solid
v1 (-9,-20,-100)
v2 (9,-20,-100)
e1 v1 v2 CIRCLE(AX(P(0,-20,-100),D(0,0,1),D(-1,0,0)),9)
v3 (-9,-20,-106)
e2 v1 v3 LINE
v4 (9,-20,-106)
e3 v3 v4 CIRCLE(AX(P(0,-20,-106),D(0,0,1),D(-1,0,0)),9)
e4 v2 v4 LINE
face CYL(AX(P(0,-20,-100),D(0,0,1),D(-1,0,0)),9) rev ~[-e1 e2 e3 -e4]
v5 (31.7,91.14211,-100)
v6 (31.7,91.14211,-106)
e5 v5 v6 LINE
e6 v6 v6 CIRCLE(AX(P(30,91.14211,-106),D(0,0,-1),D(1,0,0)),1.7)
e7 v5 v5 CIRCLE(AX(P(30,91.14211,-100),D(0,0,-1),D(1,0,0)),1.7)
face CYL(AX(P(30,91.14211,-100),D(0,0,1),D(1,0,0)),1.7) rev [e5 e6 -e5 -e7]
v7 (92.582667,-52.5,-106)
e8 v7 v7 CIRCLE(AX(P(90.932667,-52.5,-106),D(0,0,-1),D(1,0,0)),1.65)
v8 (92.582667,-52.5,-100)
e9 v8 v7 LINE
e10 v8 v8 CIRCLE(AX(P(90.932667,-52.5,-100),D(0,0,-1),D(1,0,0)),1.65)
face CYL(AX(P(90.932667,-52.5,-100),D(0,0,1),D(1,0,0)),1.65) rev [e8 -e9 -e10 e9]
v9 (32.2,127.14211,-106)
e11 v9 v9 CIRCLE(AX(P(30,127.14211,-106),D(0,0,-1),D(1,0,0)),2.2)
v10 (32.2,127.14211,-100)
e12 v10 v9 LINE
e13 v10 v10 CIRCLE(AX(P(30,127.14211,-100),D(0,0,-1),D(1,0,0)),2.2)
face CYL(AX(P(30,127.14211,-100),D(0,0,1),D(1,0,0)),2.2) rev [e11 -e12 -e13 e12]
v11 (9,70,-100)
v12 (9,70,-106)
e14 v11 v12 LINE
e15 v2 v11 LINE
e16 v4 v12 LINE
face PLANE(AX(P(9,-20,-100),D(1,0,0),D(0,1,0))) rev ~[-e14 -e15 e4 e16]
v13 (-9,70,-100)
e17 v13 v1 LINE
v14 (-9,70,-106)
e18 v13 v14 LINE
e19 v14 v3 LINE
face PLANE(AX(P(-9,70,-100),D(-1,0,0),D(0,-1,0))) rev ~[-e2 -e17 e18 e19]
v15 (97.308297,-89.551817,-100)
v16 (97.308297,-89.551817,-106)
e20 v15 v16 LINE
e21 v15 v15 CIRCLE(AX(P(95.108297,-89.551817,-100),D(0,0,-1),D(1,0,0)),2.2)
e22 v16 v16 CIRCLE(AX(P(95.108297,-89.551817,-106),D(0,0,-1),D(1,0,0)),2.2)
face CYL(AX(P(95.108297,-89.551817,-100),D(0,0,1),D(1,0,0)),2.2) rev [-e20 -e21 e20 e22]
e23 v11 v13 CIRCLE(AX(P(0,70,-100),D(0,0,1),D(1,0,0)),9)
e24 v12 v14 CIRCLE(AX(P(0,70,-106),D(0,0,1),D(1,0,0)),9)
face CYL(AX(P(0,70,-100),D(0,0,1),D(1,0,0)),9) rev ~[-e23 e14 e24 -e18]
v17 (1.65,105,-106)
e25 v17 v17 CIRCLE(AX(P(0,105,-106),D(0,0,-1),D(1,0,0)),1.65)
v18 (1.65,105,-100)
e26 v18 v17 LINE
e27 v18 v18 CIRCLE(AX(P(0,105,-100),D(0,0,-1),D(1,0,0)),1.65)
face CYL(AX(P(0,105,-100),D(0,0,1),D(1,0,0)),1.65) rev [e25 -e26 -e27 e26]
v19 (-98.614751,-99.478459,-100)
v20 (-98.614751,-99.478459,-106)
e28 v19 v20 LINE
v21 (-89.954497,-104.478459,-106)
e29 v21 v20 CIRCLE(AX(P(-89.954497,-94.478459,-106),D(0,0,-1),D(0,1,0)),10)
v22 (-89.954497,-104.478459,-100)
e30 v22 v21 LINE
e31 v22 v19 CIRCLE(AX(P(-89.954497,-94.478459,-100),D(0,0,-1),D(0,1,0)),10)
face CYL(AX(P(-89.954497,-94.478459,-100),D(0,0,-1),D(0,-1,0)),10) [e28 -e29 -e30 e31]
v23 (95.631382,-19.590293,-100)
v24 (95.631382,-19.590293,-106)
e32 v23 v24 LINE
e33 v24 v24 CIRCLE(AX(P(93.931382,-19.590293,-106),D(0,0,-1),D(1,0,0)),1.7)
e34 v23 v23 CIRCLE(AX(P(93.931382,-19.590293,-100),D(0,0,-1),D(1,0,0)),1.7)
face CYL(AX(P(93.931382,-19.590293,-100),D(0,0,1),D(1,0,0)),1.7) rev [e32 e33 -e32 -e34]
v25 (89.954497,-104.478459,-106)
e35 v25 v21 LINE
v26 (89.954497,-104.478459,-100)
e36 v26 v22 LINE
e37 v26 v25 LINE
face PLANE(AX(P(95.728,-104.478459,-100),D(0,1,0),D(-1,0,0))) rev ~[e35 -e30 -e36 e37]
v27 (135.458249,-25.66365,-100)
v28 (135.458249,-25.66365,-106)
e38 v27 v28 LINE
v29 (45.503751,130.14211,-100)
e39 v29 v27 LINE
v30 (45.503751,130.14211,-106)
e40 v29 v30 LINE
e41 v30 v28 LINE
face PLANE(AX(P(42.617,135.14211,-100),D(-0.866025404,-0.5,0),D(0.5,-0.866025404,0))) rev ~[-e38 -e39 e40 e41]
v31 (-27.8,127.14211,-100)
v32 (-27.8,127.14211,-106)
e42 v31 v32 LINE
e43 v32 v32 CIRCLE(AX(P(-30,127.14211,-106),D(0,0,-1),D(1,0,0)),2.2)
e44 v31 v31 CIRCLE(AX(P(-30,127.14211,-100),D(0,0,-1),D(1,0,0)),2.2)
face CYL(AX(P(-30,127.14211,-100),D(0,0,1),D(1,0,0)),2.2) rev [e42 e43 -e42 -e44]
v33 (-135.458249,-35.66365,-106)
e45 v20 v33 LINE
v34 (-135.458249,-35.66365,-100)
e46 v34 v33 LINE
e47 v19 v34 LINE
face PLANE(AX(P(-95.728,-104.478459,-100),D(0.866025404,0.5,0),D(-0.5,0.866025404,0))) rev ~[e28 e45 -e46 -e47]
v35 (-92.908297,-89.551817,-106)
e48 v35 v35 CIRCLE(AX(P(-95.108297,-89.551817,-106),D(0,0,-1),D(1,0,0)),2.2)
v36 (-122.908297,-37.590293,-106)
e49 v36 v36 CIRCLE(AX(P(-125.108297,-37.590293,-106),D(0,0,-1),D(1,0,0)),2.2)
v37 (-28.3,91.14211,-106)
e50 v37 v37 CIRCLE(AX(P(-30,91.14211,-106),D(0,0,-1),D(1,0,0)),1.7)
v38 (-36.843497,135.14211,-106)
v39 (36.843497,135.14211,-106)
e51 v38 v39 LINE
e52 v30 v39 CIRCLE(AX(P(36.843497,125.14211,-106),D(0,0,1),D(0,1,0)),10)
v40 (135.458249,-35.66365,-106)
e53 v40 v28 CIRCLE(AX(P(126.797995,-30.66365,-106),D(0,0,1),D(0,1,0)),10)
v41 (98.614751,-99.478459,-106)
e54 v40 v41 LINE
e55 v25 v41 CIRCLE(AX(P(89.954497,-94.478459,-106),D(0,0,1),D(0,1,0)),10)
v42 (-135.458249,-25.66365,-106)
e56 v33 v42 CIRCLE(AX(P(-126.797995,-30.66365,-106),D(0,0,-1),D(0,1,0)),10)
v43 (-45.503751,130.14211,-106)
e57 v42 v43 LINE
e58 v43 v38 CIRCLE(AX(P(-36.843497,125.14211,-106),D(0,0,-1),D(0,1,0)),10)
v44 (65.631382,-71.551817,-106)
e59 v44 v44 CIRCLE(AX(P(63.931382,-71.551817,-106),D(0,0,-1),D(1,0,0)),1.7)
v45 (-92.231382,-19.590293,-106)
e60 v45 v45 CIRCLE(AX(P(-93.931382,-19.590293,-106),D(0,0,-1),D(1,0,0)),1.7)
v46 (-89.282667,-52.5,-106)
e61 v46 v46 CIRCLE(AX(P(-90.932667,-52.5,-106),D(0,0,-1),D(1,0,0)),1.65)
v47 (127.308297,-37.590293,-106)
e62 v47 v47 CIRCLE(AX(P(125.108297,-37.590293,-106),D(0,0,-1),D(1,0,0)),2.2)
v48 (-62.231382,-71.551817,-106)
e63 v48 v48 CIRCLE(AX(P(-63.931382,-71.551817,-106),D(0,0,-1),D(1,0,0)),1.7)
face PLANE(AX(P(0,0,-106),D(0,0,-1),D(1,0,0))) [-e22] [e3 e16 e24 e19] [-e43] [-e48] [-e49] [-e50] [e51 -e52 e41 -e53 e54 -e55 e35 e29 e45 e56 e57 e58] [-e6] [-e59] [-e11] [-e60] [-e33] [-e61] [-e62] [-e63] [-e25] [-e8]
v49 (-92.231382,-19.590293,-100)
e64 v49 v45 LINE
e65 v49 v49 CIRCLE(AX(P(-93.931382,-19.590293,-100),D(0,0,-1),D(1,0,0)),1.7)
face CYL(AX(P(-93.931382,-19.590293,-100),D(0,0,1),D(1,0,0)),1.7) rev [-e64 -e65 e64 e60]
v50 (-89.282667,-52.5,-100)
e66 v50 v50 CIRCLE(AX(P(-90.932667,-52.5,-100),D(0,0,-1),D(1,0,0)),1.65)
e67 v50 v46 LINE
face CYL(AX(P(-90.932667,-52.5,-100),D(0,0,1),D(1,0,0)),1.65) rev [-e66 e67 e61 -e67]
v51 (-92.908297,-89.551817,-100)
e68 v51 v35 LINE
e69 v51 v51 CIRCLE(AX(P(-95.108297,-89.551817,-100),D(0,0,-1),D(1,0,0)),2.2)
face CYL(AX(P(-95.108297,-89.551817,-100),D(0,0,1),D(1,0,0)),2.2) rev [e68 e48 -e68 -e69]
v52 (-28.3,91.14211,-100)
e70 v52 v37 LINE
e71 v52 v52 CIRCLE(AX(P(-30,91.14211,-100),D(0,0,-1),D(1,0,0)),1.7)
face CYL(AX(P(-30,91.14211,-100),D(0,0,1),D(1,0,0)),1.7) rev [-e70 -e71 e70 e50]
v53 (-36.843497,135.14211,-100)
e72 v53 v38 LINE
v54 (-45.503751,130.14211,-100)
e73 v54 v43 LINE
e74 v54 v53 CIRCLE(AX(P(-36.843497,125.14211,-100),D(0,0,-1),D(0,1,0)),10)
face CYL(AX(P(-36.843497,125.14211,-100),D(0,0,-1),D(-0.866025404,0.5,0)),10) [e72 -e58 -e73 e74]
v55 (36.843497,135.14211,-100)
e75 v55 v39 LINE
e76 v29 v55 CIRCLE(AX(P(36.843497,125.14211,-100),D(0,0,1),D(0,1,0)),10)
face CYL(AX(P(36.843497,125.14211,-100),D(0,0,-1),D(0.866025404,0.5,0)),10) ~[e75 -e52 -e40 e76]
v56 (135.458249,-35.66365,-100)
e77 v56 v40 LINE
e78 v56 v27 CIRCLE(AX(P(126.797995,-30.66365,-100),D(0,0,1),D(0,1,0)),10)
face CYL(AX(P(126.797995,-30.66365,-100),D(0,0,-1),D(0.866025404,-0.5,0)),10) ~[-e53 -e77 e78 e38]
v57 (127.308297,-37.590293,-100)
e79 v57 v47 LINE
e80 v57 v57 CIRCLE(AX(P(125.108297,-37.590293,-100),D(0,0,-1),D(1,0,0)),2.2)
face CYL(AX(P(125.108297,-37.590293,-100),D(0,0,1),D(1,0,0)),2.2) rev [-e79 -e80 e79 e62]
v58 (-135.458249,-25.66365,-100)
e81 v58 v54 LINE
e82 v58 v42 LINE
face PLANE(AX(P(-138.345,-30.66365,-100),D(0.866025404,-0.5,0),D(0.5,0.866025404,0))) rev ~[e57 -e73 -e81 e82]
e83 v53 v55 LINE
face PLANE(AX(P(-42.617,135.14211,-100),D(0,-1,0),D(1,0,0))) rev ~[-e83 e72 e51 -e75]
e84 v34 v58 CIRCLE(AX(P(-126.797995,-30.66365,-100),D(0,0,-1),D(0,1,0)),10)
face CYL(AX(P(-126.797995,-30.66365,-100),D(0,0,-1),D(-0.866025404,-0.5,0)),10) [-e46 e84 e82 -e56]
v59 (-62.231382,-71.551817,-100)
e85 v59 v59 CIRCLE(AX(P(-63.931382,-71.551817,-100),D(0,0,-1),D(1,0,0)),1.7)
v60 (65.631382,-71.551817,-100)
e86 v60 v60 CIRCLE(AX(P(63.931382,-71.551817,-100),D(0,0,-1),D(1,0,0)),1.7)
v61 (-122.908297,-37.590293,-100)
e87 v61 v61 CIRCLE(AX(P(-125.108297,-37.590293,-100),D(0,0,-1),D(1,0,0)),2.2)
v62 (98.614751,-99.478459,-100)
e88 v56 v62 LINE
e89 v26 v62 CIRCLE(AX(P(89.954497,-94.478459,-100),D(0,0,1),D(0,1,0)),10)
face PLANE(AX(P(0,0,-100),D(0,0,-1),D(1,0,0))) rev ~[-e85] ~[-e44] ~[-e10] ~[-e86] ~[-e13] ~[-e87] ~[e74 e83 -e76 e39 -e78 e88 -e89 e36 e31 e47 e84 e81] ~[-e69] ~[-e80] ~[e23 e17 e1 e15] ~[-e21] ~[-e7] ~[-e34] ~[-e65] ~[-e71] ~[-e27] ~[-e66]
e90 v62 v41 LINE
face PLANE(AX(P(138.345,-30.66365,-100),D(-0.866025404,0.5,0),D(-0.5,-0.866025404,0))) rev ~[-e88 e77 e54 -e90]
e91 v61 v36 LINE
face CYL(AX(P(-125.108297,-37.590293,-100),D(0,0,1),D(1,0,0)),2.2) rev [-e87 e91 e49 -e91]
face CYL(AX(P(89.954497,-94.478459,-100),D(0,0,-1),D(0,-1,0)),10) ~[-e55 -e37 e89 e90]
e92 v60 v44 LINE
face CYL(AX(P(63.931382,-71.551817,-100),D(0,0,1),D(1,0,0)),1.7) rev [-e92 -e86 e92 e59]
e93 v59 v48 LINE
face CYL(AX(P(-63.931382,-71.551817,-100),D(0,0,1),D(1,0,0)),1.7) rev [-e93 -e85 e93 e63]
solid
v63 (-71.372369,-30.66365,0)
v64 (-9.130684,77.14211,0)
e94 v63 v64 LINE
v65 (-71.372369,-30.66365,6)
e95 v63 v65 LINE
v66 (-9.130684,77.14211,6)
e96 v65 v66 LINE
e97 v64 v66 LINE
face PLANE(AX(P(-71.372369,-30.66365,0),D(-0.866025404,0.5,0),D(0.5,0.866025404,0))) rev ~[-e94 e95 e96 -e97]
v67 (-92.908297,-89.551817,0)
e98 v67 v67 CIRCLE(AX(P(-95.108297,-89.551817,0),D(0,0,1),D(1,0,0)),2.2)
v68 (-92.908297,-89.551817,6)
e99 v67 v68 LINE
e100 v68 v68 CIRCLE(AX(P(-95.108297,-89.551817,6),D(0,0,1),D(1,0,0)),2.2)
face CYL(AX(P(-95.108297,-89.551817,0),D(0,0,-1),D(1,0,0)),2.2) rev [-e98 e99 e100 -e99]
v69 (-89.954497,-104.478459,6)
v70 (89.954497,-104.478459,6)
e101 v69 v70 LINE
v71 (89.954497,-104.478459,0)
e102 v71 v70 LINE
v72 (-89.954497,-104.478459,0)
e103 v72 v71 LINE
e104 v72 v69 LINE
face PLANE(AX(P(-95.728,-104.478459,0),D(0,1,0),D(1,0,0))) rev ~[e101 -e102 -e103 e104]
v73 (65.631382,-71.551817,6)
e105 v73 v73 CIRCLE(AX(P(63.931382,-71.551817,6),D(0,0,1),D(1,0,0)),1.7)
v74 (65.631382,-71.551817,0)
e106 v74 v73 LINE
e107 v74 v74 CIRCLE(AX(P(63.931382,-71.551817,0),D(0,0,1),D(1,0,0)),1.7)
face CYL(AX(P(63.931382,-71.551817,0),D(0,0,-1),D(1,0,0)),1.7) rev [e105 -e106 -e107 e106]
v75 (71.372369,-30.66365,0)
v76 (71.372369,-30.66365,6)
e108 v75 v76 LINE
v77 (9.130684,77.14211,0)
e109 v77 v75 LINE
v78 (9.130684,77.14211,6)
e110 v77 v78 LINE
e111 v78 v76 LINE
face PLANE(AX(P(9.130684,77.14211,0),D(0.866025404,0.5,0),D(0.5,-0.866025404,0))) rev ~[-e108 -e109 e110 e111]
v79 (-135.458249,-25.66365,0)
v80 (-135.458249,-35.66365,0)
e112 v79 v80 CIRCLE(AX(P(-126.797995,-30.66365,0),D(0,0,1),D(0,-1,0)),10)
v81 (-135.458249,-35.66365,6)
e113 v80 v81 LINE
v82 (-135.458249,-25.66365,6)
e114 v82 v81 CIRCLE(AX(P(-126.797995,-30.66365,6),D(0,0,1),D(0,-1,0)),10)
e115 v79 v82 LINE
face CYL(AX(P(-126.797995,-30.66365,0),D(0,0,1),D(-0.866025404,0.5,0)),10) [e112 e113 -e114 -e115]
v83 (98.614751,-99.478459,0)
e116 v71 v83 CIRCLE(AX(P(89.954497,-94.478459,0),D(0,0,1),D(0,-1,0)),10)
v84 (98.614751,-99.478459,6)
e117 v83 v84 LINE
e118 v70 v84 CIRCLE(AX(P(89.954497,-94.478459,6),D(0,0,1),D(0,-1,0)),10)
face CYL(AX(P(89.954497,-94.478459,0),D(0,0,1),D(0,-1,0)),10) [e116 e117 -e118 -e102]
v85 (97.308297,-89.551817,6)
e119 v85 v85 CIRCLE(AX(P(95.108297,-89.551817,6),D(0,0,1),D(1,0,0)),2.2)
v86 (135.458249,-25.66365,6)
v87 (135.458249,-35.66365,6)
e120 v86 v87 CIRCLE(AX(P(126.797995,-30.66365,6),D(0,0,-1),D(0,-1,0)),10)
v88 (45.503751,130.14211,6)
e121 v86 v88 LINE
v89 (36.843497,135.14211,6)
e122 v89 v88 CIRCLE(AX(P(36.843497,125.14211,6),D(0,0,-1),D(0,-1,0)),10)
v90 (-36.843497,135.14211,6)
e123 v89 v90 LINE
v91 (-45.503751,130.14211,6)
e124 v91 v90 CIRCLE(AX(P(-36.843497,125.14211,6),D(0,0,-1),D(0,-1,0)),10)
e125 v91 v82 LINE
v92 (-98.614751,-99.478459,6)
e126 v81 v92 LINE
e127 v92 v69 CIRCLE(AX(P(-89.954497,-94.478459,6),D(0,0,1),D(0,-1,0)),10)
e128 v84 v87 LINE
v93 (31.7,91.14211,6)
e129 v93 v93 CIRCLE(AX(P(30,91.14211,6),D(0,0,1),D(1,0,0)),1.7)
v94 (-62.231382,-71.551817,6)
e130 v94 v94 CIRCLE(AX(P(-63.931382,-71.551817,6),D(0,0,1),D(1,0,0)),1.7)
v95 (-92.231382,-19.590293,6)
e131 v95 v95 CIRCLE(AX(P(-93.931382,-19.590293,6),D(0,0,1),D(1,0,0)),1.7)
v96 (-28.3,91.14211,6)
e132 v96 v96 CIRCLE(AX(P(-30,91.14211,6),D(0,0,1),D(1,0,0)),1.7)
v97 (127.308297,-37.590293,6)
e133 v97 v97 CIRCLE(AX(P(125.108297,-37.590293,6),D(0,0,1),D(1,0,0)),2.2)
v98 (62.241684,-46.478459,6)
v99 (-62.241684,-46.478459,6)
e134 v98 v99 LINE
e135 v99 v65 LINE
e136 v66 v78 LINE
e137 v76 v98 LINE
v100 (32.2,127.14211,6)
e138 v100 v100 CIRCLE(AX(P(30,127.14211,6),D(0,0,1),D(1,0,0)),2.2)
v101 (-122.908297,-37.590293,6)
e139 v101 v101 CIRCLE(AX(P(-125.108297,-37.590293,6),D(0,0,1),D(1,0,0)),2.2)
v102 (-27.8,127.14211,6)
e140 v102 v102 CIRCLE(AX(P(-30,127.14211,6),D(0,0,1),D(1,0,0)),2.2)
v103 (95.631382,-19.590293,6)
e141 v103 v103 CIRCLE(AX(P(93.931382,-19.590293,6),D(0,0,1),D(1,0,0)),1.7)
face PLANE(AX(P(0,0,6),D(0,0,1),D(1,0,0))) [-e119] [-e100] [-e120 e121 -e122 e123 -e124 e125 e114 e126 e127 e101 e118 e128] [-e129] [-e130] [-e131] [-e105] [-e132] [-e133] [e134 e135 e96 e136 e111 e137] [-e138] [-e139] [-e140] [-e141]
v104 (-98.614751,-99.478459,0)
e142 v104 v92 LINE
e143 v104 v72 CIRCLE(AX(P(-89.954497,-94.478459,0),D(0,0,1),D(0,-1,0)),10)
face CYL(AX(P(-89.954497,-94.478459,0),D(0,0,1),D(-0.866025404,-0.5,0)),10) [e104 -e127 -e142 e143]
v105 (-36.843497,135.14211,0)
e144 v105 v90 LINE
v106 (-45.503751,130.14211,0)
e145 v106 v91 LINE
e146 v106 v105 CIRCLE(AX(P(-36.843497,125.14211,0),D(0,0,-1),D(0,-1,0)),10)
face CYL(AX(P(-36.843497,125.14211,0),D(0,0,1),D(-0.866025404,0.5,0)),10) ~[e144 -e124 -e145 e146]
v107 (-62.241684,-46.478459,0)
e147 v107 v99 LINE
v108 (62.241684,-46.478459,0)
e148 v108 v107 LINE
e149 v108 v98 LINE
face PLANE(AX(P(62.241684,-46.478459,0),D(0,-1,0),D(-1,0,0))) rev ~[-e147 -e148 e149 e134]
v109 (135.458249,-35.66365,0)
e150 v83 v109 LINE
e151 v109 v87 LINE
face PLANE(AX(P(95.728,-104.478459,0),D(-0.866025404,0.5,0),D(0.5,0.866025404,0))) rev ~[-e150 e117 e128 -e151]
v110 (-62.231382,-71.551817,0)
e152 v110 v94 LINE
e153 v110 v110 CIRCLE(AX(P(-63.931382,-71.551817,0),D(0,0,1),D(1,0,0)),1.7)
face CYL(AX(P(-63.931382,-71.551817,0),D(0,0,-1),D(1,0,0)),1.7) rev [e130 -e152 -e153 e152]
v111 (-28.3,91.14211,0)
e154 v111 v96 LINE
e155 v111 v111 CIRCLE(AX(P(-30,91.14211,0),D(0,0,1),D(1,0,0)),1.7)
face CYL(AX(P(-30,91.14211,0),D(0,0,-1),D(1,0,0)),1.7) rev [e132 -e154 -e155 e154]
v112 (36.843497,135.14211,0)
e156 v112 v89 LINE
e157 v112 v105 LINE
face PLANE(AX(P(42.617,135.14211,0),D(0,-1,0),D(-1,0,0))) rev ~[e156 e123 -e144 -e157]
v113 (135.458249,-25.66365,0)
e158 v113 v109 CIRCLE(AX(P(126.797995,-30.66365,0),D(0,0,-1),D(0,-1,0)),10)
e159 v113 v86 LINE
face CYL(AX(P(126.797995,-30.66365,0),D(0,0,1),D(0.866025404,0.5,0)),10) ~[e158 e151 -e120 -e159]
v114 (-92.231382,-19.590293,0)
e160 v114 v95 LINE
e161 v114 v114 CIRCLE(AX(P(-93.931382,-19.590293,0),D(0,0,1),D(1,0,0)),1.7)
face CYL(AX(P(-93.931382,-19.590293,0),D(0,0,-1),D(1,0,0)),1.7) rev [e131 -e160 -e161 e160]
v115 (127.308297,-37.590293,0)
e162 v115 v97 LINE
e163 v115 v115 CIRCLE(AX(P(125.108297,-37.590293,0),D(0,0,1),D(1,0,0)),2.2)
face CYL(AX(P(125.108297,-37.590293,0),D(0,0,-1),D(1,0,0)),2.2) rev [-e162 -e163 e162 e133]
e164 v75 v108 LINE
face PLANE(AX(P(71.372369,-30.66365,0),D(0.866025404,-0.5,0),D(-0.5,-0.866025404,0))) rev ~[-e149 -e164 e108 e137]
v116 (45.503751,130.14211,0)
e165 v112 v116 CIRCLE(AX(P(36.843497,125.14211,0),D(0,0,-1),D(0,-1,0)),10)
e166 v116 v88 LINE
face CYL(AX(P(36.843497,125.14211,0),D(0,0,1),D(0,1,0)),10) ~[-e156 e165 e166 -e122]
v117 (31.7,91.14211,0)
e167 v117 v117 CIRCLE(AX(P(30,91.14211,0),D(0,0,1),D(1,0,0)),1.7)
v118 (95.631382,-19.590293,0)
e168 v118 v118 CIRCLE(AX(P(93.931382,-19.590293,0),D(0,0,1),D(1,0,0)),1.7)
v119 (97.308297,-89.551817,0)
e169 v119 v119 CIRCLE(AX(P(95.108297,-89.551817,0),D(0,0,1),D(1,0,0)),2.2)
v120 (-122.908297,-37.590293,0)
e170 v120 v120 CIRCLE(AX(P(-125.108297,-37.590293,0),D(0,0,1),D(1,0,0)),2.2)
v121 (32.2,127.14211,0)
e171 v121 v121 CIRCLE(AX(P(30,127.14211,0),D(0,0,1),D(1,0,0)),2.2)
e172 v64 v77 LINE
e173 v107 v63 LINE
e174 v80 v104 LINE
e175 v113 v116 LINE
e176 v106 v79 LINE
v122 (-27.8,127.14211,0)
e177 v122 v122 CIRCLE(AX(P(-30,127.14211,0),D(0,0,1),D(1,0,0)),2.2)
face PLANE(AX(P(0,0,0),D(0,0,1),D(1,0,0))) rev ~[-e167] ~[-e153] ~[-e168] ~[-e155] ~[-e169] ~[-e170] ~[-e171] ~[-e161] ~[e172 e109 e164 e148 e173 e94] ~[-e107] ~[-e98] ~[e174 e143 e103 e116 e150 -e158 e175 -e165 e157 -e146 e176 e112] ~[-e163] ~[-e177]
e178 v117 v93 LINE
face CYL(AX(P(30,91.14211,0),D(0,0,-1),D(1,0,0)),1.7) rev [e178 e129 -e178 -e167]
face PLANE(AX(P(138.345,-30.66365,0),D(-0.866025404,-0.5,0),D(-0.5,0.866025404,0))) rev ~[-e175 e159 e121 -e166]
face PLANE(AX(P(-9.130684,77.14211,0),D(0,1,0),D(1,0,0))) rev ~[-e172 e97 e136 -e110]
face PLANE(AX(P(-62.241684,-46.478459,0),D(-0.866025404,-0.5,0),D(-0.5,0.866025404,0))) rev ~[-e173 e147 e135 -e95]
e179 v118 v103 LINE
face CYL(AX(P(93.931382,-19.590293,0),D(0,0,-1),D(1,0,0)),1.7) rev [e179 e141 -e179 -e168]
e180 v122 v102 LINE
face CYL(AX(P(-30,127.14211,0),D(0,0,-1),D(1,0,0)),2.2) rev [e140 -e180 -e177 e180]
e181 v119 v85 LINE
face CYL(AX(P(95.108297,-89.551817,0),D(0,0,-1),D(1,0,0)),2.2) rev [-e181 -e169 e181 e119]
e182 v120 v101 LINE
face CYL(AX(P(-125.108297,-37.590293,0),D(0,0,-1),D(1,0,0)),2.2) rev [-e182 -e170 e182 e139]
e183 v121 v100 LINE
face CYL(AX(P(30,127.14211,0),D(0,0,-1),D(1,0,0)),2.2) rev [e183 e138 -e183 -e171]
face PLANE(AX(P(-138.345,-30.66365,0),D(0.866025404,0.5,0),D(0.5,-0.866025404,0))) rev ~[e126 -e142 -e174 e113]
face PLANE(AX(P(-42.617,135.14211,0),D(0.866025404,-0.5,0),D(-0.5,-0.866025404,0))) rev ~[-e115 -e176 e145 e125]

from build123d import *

# Parameters (mm, degrees)
F0_R     = 2.2
F0_R_2   = 1.7
F1_DEPTH = 6
F3_R     = 2.2
F3_R_2   = 1.7
F3_R_3   = 1.65
F4_DEPTH = 6
F5_R     = 10
F5_2_R   = 10


# Not quite as in the source:
# - a feature names something its author has since deleted; it is built from what else it names


with BuildPart() as f1:
    # F0 (on Top) → F1 (new body)
    with BuildSketch(Plane.XY):
        Polygon((-42.617, 135.14210956), (-138.345, -30.6636501469), (-95.728, -104.4784594131), (95.728, -104.4784594131), (138.345, -30.6636501469), (42.617, 135.14210956), align=None)
        with Locations((-95.1082967697, -89.5518168935)):
            Circle(F0_R, mode=Mode.SUBTRACT)
        with Locations((-63.9313822335, -71.5518168935)):
            Circle(F0_R_2, mode=Mode.SUBTRACT)
        with Locations((-125.1082967697, -37.5902926665)):
            Circle(F0_R, mode=Mode.SUBTRACT)
        with Locations((-93.9313822335, -19.5902926665)):
            Circle(F0_R_2, mode=Mode.SUBTRACT)
        with Locations((63.9313822335, -71.5518168935)):
            Circle(F0_R_2, mode=Mode.SUBTRACT)
        with Locations((95.1082967697, -89.5518168935)):
            Circle(F0_R, mode=Mode.SUBTRACT)
        Polygon((71.372368774, -30.6636501469), (62.241684387, -46.4784594131), (-62.241684387, -46.4784594131), (-71.372368774, -30.6636501469), (-9.130684387, 77.14210956), (9.130684387, 77.14210956), align=None, mode=Mode.SUBTRACT)
        with Locations((93.9313822335, -19.5902926665)):
            Circle(F0_R_2, mode=Mode.SUBTRACT)
        with Locations((125.1082967697, -37.5902926665)):
            Circle(F0_R, mode=Mode.SUBTRACT)
        with Locations((-30, 91.14210956)):
            Circle(F0_R_2, mode=Mode.SUBTRACT)
        with Locations((-30, 127.14210956)):
            Circle(F0_R, mode=Mode.SUBTRACT)
        with Locations((30, 91.14210956)):
            Circle(F0_R_2, mode=Mode.SUBTRACT)
        with Locations((30, 127.14210956)):
            Circle(F0_R, mode=Mode.SUBTRACT)
    extrude(amount=F1_DEPTH)

    # F5
    f5_edges = [f1.edges().sort_by_distance(p)[0] for p in [
        (95.728, -104.478459, 3),
        (138.345, -30.66365, 3),
        (-95.728, -104.478459, 3),
        (-138.345, -30.66365, 3),
        (-42.617, 135.14211, 3),
        (42.617, 135.14211, 3),
    ]]
    fillet(f5_edges, radius=F5_R)


with BuildPart() as f4:
    # F3 (on offset) → F4 (new body)
    with BuildSketch(Plane(origin=(0, 0, -100), x_dir=(1, 0, 0), z_dir=(0, 0, -1))):
        Polygon((95.728, 104.4784594131), (-95.728, 104.4784594131), (-138.345, 30.6636501469), (-42.617, -135.14210956), (42.617, -135.14210956), (138.345, 30.6636501469), align=None)
        with Locations((-30, -127.14210956)):
            Circle(F3_R, mode=Mode.SUBTRACT)
        with Locations((-30, -91.14210956)):
            Circle(F3_R_2, mode=Mode.SUBTRACT)
        with Locations((0, -105)):
            Circle(F3_R_3, mode=Mode.SUBTRACT)
        with BuildLine():
            Line((-9, -70), (-9, 20))
            ThreePointArc((-9, 20), (0, 29), (9, 20))
            Line((9, 20), (9, -70))
            ThreePointArc((9, -70), (0, -79), (-9, -70))
        make_face(mode=Mode.SUBTRACT)
        with Locations((30, -127.14210956)):
            Circle(F3_R, mode=Mode.SUBTRACT)
        with Locations((30, -91.14210956)):
            Circle(F3_R_2, mode=Mode.SUBTRACT)
        with Locations((-125.1082967697, 37.5902926665)):
            Circle(F3_R, mode=Mode.SUBTRACT)
        with Locations((-93.9313822335, 19.5902926665)):
            Circle(F3_R_2, mode=Mode.SUBTRACT)
        with Locations((-90.9326673974, 52.5)):
            Circle(F3_R_3, mode=Mode.SUBTRACT)
        with Locations((-95.1082967697, 89.5518168935)):
            Circle(F3_R, mode=Mode.SUBTRACT)
        with Locations((-63.9313822335, 71.5518168935)):
            Circle(F3_R_2, mode=Mode.SUBTRACT)
        with Locations((93.9313822335, 19.5902926665)):
            Circle(F3_R_2, mode=Mode.SUBTRACT)
        with Locations((125.1082967697, 37.5902926665)):
            Circle(F3_R, mode=Mode.SUBTRACT)
        with Locations((63.9313822335, 71.5518168935)):
            Circle(F3_R_2, mode=Mode.SUBTRACT)
        with Locations((90.9326673974, 52.5)):
            Circle(F3_R_3, mode=Mode.SUBTRACT)
        with Locations((95.1082967697, 89.5518168935)):
            Circle(F3_R, mode=Mode.SUBTRACT)
    extrude(amount=F4_DEPTH)

    # F5#2
    f5_2_edges = [f4.edges().sort_by_distance(p)[0] for p in [
        (-42.617, 135.14211, -103),
        (42.617, 135.14211, -103),
        (138.345, -30.66365, -103),
        (95.728, -104.478459, -103),
        (-95.728, -104.478459, -103),
        (-138.345, -30.66365, -103),
    ]]
    fillet(f5_2_edges, radius=F5_2_R)


solid = Compound([f1.part, f4.part])
